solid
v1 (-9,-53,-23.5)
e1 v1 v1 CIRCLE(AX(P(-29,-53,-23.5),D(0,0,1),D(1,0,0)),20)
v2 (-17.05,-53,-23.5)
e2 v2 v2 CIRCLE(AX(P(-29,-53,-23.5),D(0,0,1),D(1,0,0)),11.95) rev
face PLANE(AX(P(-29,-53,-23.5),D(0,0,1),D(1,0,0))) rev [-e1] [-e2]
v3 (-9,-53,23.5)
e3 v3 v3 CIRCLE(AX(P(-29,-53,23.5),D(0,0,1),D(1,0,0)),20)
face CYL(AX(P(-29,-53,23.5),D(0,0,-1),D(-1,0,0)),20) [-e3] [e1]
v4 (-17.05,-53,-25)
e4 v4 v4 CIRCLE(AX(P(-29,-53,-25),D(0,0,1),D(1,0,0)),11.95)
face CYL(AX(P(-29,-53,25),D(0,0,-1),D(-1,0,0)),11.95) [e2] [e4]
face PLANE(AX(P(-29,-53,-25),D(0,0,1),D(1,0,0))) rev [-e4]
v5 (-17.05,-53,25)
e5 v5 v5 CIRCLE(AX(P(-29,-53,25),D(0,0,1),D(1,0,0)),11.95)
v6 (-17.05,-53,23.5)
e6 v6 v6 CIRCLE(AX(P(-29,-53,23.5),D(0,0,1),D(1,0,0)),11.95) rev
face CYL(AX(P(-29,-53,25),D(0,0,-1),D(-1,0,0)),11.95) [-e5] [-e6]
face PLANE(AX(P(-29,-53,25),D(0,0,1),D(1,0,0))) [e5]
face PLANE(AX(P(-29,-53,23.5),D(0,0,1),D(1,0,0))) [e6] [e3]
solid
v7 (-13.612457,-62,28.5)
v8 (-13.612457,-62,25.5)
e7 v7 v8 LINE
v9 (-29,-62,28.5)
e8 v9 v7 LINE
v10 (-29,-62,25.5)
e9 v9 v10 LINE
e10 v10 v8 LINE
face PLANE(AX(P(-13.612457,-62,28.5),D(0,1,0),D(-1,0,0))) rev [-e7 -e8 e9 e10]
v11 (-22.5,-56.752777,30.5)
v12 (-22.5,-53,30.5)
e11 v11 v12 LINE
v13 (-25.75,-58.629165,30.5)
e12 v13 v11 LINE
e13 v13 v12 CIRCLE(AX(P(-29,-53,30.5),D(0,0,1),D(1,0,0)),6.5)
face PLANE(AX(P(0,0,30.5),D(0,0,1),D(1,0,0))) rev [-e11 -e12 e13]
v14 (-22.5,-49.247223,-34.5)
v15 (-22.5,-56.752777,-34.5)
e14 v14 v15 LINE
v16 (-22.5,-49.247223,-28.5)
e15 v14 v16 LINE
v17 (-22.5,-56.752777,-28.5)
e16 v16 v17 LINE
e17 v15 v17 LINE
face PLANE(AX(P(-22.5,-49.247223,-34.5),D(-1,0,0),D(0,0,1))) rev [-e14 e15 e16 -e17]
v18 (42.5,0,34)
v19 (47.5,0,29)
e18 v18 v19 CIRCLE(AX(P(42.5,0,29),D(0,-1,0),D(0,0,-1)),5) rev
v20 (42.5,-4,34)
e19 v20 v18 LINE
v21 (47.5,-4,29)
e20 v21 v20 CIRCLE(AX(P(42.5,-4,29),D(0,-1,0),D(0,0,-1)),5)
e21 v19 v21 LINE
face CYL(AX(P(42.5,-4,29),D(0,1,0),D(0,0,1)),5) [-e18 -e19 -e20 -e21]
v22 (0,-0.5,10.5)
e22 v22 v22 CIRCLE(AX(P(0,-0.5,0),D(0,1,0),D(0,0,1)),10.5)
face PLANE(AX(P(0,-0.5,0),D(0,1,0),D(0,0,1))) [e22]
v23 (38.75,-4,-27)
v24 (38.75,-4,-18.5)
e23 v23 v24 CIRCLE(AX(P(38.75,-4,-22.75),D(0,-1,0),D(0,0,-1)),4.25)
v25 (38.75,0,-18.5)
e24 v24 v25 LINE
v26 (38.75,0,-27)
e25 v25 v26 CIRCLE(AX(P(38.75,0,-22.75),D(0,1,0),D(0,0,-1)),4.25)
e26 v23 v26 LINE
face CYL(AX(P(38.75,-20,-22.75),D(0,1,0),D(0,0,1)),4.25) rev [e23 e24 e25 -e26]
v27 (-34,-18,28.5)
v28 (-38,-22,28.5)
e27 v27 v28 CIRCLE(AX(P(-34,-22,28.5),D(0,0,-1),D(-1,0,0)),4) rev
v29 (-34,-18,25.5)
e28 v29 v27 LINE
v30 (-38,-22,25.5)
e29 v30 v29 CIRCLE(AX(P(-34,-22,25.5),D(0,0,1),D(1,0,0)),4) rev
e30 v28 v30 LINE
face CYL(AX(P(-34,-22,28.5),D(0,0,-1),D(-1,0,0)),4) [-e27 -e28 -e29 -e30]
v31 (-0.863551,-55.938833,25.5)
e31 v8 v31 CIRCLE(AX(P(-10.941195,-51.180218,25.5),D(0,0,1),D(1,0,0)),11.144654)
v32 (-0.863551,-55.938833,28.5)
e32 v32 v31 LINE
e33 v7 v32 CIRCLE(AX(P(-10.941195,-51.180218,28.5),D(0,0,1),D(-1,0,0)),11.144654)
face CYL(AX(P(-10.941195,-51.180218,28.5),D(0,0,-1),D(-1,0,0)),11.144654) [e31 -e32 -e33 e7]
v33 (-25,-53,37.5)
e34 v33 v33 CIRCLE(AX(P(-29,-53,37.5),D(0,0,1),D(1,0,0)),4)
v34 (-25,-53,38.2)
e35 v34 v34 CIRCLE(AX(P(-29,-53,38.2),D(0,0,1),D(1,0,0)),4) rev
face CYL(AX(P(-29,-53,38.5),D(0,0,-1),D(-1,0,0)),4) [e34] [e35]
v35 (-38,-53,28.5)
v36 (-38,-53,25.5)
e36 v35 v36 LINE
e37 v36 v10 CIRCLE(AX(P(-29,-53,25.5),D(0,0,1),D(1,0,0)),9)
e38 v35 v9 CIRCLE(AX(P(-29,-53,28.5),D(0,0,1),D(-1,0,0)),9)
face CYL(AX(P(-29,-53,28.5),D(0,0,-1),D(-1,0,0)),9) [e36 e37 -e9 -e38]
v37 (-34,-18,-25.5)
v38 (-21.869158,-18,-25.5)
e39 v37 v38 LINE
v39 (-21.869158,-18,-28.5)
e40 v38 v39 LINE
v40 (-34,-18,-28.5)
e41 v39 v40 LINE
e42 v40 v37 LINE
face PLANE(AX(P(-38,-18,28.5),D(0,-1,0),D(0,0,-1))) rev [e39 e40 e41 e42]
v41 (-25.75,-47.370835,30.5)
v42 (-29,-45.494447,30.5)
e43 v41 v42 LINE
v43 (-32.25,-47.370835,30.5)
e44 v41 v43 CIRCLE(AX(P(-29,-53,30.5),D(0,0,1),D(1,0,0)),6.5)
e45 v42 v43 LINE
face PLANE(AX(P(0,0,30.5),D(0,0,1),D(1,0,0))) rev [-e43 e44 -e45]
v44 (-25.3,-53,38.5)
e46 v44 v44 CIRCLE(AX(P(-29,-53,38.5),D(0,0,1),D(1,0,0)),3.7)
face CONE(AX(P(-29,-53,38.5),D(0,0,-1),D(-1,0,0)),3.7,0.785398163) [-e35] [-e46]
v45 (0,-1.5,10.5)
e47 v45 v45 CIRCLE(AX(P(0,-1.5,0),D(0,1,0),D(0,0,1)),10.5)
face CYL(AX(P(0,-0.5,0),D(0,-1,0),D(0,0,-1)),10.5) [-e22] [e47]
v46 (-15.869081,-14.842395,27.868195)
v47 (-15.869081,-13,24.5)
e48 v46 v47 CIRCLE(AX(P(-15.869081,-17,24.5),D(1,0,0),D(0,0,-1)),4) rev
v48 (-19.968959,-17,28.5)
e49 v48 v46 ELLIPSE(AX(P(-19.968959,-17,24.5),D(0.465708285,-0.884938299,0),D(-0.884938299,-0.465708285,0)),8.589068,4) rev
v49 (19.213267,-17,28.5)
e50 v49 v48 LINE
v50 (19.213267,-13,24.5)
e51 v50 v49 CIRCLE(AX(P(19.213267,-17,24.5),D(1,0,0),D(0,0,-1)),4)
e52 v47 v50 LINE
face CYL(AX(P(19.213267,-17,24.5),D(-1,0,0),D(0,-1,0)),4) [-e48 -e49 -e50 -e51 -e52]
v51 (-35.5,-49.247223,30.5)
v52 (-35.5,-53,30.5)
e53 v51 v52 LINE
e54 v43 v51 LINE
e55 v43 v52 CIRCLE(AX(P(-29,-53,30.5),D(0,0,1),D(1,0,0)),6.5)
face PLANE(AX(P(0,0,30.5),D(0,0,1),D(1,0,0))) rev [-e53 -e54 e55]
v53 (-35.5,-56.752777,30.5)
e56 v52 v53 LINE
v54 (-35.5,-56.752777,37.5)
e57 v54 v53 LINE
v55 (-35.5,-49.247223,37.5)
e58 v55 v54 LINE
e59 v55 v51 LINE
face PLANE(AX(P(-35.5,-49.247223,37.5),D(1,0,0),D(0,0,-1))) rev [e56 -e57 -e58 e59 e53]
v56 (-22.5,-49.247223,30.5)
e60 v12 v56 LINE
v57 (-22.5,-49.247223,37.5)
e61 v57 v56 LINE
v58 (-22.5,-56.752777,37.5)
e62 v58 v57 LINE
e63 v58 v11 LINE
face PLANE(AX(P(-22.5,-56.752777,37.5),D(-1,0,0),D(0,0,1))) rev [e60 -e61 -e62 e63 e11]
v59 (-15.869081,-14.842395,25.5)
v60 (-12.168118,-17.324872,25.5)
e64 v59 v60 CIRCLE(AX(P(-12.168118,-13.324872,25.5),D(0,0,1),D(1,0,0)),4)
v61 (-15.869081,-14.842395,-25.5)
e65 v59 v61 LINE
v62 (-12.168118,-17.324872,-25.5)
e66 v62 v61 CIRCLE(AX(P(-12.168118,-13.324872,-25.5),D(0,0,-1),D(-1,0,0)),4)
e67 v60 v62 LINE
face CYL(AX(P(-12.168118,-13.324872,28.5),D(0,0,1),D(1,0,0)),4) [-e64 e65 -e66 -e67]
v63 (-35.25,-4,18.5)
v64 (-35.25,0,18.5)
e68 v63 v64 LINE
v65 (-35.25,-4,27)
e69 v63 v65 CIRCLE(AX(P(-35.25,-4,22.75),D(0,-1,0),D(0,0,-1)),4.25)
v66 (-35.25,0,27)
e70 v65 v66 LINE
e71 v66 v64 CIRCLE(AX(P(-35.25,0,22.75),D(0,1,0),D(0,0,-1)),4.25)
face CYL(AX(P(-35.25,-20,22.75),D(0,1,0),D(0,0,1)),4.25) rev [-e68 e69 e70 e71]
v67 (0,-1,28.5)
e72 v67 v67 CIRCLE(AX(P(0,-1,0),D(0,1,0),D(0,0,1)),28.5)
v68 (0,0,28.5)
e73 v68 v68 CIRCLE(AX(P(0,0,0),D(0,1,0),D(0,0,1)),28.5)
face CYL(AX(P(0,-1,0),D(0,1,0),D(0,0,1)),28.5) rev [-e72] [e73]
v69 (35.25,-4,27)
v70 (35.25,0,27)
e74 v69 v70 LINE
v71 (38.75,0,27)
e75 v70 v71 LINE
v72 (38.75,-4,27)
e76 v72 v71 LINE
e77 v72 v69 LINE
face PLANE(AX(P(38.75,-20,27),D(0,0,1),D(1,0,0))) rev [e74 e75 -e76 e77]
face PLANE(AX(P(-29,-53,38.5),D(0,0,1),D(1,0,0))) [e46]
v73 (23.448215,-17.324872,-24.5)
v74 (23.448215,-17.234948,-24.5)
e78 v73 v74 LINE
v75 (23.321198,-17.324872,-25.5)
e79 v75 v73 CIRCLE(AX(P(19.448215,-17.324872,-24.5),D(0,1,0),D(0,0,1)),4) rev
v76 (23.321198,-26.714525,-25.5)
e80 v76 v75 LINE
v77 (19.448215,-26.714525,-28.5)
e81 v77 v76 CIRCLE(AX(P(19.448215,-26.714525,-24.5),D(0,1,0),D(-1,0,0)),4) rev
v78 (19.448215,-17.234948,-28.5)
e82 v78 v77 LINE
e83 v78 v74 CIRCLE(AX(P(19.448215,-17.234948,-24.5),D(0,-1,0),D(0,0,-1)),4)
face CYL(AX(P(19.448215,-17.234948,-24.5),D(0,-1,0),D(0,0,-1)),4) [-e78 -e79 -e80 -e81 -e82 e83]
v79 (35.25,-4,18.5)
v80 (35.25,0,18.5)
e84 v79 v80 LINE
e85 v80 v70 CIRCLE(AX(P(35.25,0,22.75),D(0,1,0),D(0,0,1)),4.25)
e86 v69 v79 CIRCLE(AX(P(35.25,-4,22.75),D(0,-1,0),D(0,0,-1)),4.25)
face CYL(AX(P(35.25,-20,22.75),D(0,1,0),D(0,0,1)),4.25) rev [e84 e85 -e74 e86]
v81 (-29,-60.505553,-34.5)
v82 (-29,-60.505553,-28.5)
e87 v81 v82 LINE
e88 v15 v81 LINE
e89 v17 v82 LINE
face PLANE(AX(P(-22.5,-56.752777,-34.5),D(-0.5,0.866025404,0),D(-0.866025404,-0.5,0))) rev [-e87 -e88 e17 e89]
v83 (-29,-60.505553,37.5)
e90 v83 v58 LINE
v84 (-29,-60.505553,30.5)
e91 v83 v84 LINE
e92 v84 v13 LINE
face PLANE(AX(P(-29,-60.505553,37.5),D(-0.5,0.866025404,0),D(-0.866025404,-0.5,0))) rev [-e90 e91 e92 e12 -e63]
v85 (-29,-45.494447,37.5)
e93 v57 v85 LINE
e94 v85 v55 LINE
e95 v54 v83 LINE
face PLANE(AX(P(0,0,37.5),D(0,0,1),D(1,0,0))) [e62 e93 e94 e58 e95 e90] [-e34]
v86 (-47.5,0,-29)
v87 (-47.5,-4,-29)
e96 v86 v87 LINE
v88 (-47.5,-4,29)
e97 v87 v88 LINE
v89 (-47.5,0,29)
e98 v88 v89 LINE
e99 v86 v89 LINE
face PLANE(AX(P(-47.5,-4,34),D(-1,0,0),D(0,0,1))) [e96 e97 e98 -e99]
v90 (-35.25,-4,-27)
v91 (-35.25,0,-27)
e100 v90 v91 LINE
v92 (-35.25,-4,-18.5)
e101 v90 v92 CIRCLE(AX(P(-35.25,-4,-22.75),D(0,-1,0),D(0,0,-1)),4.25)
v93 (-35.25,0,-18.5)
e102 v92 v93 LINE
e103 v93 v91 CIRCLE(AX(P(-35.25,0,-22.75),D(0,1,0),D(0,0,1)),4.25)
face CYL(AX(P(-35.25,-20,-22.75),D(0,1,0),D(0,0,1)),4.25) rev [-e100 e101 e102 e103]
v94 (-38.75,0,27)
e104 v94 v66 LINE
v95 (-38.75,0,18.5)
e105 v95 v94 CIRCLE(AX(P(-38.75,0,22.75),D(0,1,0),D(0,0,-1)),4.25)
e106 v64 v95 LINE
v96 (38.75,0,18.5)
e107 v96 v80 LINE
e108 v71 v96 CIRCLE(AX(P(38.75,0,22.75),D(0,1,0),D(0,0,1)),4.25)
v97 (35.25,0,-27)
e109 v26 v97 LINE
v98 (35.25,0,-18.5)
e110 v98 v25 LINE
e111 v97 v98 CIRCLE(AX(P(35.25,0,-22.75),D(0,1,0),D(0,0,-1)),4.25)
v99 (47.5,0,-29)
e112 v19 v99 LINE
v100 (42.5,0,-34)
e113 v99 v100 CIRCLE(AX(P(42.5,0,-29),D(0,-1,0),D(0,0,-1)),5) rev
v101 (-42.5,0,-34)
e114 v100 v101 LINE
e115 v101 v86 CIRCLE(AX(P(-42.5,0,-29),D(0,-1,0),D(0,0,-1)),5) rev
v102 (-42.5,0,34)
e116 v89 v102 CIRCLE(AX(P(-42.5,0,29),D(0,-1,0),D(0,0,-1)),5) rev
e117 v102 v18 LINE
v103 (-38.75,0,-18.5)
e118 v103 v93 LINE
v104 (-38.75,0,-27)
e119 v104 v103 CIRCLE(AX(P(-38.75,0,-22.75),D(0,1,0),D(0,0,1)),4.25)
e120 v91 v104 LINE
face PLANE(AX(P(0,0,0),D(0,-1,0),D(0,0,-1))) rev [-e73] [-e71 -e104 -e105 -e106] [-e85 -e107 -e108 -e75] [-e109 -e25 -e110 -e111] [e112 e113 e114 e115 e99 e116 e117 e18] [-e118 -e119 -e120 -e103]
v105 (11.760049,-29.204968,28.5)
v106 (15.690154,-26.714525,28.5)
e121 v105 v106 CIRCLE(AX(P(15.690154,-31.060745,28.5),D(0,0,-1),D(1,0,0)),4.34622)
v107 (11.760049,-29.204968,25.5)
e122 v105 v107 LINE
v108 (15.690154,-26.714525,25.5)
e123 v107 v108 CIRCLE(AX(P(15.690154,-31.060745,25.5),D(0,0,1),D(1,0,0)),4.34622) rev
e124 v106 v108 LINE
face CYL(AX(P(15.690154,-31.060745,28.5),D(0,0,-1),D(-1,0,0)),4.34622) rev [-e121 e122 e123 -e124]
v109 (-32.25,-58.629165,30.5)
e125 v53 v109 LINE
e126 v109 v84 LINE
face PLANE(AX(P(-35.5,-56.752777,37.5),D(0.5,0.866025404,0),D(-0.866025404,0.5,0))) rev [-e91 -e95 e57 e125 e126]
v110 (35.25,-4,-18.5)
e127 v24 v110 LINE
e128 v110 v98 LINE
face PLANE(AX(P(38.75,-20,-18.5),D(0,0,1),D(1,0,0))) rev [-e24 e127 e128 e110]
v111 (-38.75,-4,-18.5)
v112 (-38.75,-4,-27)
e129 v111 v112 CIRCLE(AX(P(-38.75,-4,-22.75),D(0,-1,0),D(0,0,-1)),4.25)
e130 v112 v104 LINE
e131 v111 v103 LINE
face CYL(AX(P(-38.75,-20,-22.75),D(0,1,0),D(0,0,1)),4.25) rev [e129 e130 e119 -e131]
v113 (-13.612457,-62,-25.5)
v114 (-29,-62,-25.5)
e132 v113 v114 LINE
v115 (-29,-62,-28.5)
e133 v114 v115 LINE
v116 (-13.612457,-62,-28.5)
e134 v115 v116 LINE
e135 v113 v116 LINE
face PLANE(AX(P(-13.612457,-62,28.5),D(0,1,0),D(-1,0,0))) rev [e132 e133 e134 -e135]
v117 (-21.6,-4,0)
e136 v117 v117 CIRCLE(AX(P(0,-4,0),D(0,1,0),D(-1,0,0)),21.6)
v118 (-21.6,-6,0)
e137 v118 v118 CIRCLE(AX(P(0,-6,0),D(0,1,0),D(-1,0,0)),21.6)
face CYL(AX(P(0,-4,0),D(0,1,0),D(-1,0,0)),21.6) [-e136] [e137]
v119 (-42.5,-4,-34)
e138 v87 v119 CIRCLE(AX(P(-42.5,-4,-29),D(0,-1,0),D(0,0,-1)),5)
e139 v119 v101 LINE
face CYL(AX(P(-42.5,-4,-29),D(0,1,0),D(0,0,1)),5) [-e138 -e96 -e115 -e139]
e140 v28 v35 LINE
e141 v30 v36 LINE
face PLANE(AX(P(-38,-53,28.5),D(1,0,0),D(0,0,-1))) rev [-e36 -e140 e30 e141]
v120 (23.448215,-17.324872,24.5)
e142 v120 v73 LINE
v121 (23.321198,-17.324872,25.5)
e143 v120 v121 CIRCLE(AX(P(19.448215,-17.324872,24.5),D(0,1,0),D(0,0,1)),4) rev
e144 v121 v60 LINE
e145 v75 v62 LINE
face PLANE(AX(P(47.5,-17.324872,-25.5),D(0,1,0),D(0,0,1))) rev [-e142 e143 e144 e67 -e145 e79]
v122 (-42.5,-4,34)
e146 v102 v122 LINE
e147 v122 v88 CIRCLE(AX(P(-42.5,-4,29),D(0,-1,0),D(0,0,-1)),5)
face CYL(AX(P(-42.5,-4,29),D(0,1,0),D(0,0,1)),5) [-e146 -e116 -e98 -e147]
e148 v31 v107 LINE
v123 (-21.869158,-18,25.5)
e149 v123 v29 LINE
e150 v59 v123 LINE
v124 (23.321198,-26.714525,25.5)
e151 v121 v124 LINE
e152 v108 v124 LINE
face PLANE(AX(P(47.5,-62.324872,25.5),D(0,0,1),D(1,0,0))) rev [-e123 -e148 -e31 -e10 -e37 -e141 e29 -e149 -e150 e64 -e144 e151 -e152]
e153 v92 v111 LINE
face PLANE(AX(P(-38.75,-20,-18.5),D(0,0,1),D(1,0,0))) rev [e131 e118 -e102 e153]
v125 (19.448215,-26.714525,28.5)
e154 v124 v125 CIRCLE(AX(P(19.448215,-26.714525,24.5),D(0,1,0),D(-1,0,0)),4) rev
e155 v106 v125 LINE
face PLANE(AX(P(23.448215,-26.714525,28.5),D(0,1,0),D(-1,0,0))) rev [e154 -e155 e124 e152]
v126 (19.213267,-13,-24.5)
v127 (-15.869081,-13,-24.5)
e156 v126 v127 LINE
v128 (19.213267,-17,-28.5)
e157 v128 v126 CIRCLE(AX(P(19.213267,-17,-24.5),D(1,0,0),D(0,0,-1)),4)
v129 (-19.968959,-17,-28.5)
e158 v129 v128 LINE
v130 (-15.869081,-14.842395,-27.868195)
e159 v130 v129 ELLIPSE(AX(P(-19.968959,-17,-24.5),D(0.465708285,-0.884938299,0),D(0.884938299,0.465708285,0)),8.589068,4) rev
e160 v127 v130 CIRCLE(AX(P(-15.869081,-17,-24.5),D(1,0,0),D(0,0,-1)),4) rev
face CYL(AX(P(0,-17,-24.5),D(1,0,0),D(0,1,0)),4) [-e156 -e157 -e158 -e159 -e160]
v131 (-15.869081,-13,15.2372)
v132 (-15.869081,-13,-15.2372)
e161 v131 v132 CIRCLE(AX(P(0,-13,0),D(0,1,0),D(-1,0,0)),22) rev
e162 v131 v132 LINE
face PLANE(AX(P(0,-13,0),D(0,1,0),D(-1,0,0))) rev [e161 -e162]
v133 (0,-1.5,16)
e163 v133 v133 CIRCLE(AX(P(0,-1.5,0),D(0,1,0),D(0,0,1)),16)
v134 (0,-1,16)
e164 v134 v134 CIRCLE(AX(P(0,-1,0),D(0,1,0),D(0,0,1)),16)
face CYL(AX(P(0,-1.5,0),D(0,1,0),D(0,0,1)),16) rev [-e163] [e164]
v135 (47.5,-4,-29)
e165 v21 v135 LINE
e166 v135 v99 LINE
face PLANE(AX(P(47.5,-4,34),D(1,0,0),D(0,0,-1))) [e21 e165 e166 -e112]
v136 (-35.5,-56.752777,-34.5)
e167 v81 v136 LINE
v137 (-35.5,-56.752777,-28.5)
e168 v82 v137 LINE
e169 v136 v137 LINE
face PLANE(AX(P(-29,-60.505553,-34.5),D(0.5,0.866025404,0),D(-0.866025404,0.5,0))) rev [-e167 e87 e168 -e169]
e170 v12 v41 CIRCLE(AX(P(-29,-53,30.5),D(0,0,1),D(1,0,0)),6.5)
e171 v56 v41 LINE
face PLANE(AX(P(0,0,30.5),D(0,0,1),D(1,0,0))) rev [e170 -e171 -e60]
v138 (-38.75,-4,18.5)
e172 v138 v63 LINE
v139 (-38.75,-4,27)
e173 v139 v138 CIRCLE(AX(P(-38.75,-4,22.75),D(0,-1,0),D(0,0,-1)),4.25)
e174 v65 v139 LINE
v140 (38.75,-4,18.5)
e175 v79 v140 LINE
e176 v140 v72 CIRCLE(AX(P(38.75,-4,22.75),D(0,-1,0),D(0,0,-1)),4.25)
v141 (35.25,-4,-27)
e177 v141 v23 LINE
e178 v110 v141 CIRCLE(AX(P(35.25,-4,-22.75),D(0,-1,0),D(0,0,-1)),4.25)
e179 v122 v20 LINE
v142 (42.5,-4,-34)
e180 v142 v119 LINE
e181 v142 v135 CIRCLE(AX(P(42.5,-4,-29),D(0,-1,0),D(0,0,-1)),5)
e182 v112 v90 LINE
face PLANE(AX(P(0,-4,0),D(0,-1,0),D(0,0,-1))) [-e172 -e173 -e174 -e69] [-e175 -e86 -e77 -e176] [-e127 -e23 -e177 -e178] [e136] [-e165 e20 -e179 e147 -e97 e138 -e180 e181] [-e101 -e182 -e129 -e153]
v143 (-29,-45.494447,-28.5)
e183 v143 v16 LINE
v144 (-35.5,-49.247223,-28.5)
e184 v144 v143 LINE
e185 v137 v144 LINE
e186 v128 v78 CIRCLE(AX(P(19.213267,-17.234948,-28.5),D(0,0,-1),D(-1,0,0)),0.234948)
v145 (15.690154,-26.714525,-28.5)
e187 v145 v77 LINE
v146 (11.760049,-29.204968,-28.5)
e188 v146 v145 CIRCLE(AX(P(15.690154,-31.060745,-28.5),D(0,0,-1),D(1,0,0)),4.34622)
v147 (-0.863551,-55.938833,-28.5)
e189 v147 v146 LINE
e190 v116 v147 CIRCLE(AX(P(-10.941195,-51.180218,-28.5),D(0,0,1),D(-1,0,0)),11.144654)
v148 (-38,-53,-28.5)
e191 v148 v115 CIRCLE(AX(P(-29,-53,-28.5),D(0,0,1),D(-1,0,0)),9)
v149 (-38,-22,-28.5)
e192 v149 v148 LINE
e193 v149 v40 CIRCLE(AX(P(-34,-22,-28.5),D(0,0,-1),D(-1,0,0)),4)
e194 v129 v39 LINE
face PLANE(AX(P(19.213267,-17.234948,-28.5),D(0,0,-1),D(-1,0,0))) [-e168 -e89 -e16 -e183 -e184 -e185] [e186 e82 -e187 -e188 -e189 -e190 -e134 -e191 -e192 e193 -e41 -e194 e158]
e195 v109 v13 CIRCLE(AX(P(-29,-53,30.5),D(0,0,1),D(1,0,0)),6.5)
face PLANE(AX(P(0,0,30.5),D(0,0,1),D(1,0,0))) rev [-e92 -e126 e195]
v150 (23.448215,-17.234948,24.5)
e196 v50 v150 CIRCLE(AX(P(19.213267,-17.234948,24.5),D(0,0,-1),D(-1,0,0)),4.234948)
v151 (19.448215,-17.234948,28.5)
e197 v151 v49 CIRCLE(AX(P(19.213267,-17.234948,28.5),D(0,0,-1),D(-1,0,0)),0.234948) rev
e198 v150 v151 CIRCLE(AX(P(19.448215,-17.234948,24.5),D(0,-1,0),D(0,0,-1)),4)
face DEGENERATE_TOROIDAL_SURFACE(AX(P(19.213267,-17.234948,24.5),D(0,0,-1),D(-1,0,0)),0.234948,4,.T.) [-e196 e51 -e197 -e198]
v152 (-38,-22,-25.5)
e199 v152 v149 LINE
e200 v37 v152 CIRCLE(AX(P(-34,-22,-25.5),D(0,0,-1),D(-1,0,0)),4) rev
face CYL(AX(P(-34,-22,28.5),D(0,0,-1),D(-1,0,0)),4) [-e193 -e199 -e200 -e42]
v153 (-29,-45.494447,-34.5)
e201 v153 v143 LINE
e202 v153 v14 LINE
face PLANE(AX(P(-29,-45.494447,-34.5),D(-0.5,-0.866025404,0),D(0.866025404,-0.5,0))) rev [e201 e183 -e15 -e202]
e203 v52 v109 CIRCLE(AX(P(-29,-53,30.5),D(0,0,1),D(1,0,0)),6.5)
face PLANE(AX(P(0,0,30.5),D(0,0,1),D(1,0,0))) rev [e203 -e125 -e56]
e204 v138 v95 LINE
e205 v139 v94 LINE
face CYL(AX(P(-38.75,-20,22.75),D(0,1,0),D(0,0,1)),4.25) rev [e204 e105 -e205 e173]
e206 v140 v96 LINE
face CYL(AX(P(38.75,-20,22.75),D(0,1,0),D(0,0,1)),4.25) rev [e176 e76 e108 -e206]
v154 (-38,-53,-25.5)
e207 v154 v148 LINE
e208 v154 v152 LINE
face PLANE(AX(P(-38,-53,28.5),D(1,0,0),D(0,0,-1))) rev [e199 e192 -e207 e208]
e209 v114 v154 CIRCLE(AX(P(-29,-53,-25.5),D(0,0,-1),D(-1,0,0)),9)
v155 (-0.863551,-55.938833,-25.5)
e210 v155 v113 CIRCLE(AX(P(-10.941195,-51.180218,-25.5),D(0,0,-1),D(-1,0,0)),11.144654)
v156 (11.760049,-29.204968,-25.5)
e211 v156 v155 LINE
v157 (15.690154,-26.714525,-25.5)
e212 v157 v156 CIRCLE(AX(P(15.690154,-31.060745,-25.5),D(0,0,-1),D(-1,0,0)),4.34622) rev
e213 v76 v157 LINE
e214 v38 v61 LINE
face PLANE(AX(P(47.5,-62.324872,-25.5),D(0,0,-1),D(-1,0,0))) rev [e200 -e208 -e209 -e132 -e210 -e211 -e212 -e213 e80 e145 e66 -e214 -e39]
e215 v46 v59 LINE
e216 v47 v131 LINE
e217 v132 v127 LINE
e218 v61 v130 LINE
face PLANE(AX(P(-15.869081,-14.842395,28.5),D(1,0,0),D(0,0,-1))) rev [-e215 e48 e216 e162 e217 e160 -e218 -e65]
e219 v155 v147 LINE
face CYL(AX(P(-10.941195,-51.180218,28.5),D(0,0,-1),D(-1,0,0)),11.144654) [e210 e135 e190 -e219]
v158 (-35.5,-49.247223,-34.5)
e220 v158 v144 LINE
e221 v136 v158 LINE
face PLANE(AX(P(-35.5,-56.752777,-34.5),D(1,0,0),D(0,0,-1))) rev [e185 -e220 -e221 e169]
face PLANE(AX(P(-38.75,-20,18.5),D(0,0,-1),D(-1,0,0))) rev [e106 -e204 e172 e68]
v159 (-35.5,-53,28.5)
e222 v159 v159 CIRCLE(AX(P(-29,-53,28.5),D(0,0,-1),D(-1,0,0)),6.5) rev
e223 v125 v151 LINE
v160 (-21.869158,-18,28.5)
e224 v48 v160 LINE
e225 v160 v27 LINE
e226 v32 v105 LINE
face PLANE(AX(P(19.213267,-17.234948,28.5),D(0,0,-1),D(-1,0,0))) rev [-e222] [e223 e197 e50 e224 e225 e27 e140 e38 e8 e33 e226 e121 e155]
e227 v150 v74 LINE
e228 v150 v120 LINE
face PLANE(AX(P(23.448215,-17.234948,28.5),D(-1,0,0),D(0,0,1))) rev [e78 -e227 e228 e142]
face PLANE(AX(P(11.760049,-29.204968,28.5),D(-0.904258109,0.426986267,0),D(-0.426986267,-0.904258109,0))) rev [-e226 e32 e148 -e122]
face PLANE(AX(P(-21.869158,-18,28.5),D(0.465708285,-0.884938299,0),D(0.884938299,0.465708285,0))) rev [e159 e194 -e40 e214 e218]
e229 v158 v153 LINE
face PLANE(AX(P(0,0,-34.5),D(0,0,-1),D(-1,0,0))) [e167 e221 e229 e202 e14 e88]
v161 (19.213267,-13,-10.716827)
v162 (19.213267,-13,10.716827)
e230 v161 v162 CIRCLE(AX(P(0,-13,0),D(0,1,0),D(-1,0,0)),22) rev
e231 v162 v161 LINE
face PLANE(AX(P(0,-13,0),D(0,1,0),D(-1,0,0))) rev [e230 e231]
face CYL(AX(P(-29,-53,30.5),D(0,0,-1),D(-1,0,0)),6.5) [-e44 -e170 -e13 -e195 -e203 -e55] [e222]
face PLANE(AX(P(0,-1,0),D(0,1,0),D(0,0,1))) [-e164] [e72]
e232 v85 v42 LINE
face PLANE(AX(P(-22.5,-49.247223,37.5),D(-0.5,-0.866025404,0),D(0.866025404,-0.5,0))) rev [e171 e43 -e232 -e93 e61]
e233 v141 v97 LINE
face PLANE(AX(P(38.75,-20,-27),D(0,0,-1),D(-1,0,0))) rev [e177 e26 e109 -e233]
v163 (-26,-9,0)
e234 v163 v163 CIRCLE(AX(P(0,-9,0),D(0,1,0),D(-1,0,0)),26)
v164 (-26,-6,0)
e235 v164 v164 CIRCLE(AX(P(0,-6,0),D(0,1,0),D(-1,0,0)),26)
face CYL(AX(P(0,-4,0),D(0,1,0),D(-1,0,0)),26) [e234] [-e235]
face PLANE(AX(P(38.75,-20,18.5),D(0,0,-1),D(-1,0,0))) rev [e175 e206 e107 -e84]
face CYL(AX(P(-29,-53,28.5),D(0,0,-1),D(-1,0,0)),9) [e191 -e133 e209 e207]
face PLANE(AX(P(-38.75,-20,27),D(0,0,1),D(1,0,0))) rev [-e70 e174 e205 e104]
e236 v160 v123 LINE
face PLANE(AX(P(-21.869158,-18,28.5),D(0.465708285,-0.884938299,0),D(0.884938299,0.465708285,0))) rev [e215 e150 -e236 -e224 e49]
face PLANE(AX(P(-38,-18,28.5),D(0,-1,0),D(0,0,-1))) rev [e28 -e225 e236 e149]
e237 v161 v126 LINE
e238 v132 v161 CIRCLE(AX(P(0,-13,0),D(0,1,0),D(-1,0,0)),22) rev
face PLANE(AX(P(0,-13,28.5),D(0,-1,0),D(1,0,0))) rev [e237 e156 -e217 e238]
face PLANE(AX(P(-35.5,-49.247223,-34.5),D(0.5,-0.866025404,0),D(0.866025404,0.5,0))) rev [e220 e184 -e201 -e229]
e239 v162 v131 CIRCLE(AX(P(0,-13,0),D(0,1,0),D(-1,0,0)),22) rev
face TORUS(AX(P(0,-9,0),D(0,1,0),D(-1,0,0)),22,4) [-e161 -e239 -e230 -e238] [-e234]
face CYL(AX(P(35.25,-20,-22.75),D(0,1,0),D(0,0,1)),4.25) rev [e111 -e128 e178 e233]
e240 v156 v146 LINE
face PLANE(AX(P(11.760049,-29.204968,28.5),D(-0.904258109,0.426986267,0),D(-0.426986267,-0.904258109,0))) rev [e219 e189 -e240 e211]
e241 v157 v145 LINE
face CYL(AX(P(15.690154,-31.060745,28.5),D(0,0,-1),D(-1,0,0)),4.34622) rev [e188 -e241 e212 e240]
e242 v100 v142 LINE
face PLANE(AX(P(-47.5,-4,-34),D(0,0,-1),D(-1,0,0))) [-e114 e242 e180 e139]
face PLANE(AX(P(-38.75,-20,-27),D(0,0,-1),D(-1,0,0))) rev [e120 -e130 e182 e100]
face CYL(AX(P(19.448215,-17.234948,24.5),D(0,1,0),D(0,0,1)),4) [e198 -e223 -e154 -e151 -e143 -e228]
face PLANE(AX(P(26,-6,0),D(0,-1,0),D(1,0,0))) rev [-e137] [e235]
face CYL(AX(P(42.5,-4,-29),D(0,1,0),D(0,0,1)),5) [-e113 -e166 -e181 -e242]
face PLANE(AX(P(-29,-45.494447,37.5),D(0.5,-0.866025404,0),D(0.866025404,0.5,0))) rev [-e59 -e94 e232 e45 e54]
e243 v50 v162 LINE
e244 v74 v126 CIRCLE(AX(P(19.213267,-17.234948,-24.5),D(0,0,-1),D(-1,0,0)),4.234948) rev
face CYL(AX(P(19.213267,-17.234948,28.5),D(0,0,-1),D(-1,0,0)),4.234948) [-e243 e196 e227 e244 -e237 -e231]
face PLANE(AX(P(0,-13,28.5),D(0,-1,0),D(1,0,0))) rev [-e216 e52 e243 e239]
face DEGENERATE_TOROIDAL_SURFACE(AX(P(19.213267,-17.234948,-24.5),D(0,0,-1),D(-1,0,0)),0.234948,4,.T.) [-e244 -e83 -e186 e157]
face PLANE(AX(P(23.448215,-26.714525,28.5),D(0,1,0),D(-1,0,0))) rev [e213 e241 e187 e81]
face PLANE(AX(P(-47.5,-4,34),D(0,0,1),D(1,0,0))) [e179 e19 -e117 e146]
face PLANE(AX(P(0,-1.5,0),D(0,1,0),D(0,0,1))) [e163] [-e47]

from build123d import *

# Parameters (mm, degrees)
SKETCH_1_W               = 95
SKETCH_1_H               = 68
EXTRUDE_1_DEPTH          = 4
CUT_EXTRUDE_1_DEPTH      = 20
FILLET_3_R               = 4
EXTRUDE_2_DEPTH          = 28.5
CUT_EXTRUDE_2_DEPTH      = 112.133432069
CUT_EXTRUDE_2_DEPTH_BACK = 112.133432069
SKETCH_5_W               = 51
SKETCH_5_H               = 45
FILLET_1_R               = 5
SKETCH_6_R               = 20
EXTRUDE_3_DEPTH          = 23.5
SKETCH_7_R               = 11.95
EXTRUDE_4_DEPTH          = 25
EXTRUDE_5_DEPTH          = 6
SKETCH_9_R               = 6.5
EXTRUDE_6_DEPTH          = 2
EXTRUDE_7_DEPTH          = 7
SKETCH_11_R              = 4
EXTRUDE_8_DEPTH          = 1
CHAMFER_1_SIZE           = 0.3
FILLET_4_R               = 4
SKETCH_12_R              = 28.5
CUT_EXTRUDE_3_DEPTH      = 1
SKETCH_13_R              = 16
CUT_EXTRUDE_4_DEPTH      = 0.5
SKETCH_14_R              = 10.5
EXTRUDE_9_DEPTH          = 1
FILLET_5_R               = 4


with BuildPart() as part:
    # 草图1 → 凸台-拉伸1 (new body)
    with BuildSketch(Plane(origin=(0, 0, 0), x_dir=(1, 0, 0), z_dir=(0, 1, 0))):
        Rectangle(SKETCH_1_W, SKETCH_1_H)
    extrude(amount=-EXTRUDE_1_DEPTH)

    # 草图2 → 切除-拉伸1 (cut)
    with BuildSketch(Plane(origin=(0, 0, 0), x_dir=(1, 0, 0), z_dir=(0, 1, 0))):
        with BuildLine():
            Line((-38.75, 27), (-35.25, 27))
            ThreePointArc((-35.25, 27), (-31, 22.75), (-35.25, 18.5))
            Line((-35.25, 18.5), (-38.75, 18.5))
            ThreePointArc((-38.75, 18.5), (-43, 22.75), (-38.75, 27))
        make_face()
        with BuildLine():
            Line((38.75, 27), (35.25, 27))
            ThreePointArc((35.25, 27), (31, 22.75), (35.25, 18.5))
            Line((35.25, 18.5), (38.75, 18.5))
            ThreePointArc((38.75, 18.5), (43, 22.75), (38.75, 27))
        make_face()
        with BuildLine():
            Line((-38.75, -27), (-35.25, -27))
            ThreePointArc((-35.25, -27), (-31, -22.75), (-35.25, -18.5))
            Line((-35.25, -18.5), (-38.75, -18.5))
            ThreePointArc((-38.75, -18.5), (-43, -22.75), (-38.75, -27))
        make_face()
        with BuildLine():
            Line((38.75, -27), (35.25, -27))
            ThreePointArc((35.25, -27), (31, -22.75), (35.25, -18.5))
            Line((35.25, -18.5), (38.75, -18.5))
            ThreePointArc((38.75, -18.5), (43, -22.75), (38.75, -27))
        make_face()
    extrude(amount=-CUT_EXTRUDE_1_DEPTH, mode=Mode.SUBTRACT)

    # 草图3 → 旋转1 (revolve)
    with BuildSketch(Plane.XY, mode=Mode.PRIVATE) as revolve_1_sk:
        Polygon((0, -4), (0, -13), (26, -13), (26, -6), (21.6, -6), (21.6, -4), align=None)
    revolve(revolve_1_sk.sketch.rotate(Axis((0, -4, 0), (0, -1, 0)), 180), axis=Axis((0, -4, 0), (0, -1, 0)))

    # 圆角3
    fillet_3_edges = [part.edges().sort_by_distance(p)[0] for p in [
        (26, -13, 0),
    ]]
    fillet(fillet_3_edges, radius=FILLET_3_R)

    # 草图4 → 凸台-拉伸2 (add, symmetric)
    with BuildSketch(Plane.XY):
        with BuildLine():
            Line((0, -13), (19.213266574, -13))
            ThreePointArc((19.213266574, -13), (22.207827325, -14.240387677), (23.448215001, -17.234948428))
            Line((23.448215001, -17.234948428), (23.448215001, -26.714524519))
            Line((23.448215001, -26.714524519), (15.690154109, -26.714524519))
            ThreePointArc((15.690154109, -26.714524519), (13.363781565, -27.389556753), (11.760049066, -29.204968498))
            Line((11.760049066, -29.204968498), (-0.86355109, -55.938832562))
            ThreePointArc((-0.86355109, -55.938832562), (-6.156003064, -61.245269428), (-13.61245677, -62))
            Line((-13.61245677, -62), (-29, -62))
            ThreePointArc((-29, -62), (-35.363961031, -59.363961031), (-38, -53))
            Line((-38, -53), (-38, -18))
            Line((-38, -18), (-21.869158005, -18))
            Line((-21.869158005, -18), (-15.86908091, -14.84239498))
            Line((-15.86908091, -14.84239498), (-15.86908091, -13))
            Line((-15.86908091, -13), (0, -13))
        make_face()
    extrude(amount=EXTRUDE_2_DEPTH, both=True)

    # 草图5 → 切除-拉伸2 (cut, two sides: drawn at the far end of the back side and taken through both)
    with BuildSketch(Plane.ZY.offset(38).offset(-CUT_EXTRUDE_2_DEPTH_BACK)):
        with Locations((0, -39.824872431)):
            Rectangle(SKETCH_5_W, SKETCH_5_H)
    extrude(amount=CUT_EXTRUDE_2_DEPTH + CUT_EXTRUDE_2_DEPTH_BACK, mode=Mode.SUBTRACT)

    # 圆角1
    fillet_1_edges = [part.edges().sort_by_distance(p)[0] for p in [
        (47.5, -2, 34),
        (-47.5, -2, 34),
        (-47.5, -2, -34),
        (47.5, -2, -34),
    ]]
    fillet(fillet_1_edges, radius=FILLET_1_R)

    # 草图8 → 凸台-拉伸5 (add)
    with BuildSketch(Plane(origin=(0, 0, -28.5), x_dir=(-1, 0, 0), z_dir=(0, 0, -1))):
        Polygon((29, -45.494446501), (22.5, -49.24722325), (22.5, -56.75277675), (29, -60.505553499), (35.5, -56.75277675), (35.5, -49.24722325), align=None)
    extrude(amount=EXTRUDE_5_DEPTH)

    # 草图9 → 凸台-拉伸6 (add)
    with BuildSketch(Plane.XY.offset(28.5)):
        with Locations(Location((-29, -53, 0), (0, 0, 180))):
            Circle(SKETCH_9_R)
    extrude(amount=EXTRUDE_6_DEPTH)

    # 草图10 → 凸台-拉伸7 (add)
    with BuildSketch(Plane.XY.offset(30.5)):
        Polygon((-29, -45.494446501), (-35.5, -49.24722325), (-35.5, -56.75277675), (-29, -60.505553499), (-22.5, -56.75277675), (-22.5, -49.24722325), align=None)
    extrude(amount=EXTRUDE_7_DEPTH)

    # 草图11 → 凸台-拉伸8 (add)
    with BuildSketch(Plane.XY.offset(37.5)):
        with Locations((-29, -53)):
            Circle(SKETCH_11_R)
    extrude(amount=EXTRUDE_8_DEPTH)

    # 倒角1
    chamfer_1_edges = [part.edges().sort_by_distance(p)[0] for p in [
        (-33, -53, 38.5),
    ]]
    chamfer(chamfer_1_edges, length=CHAMFER_1_SIZE)

    # 圆角4
    # the kernel refuses this fillet: 4 mm, written as the material it takes off along each edge
    with BuildSketch(Plane(origin=(-38, -18, -15.5), x_dir=(1, 0, 0), z_dir=(0, 0, -1))) as fillet_4_piece_1:
        with BuildLine():
            CenterArc((FILLET_4_R, FILLET_4_R), FILLET_4_R, 180, 90)
            Line((0, FILLET_4_R), (0, 0))
            Line((0, 0), (FILLET_4_R, 0))
        make_face()
    extrude(amount=23, mode=Mode.SUBTRACT)
    with BuildSketch(Plane(origin=(-20.586281446, -17.324872431, 25.5), x_dir=(0.8849382990030265, 0.46570828525765995, 0), z_dir=(0, 0, -1))) as fillet_4_piece_2:
        with BuildLine():
            CenterArc((9.312388245, 0.380655196), FILLET_4_R, 117.756070689, 67.704676822)
            Line((7.449555104, 3.920408392), (0, 0))
            Line((0, 0), (5.330541736, 0))
        make_face()
    extrude(amount=51, mode=Mode.SUBTRACT)
    with BuildSketch(Plane(origin=(-38, -18, 38.5), x_dir=(0, -1, 0), z_dir=(0, 0, -1))) as fillet_4_piece_3:
        with BuildLine():
            CenterArc((FILLET_4_R, -FILLET_4_R), FILLET_4_R, 90, 90)
            Line((0, -FILLET_4_R), (0, 0))
            Line((0, 0), (FILLET_4_R, 0))
        make_face()
    extrude(amount=23, mode=Mode.SUBTRACT)

    # 草图12 → 切除-拉伸3 (cut)
    with BuildSketch(Plane(origin=(0, 0, 0), x_dir=(1, 0, 0), z_dir=(0, 1, 0))):
        with Locations(Location((0, 0, 0), (0, 0, 270))):
            Circle(SKETCH_12_R)
    extrude(amount=-CUT_EXTRUDE_3_DEPTH, mode=Mode.SUBTRACT)

    # 草图13 → 切除-拉伸4 (cut)
    with BuildSketch(Plane(origin=(0, -1, 0), x_dir=(1, 0, 0), z_dir=(0, 1, 0))):
        with Locations(Location((0, 0, 0), (0, 0, 270))):
            Circle(SKETCH_13_R)
    extrude(amount=-CUT_EXTRUDE_4_DEPTH, mode=Mode.SUBTRACT)

    # 草图14 → 凸台-拉伸9 (add)
    with BuildSketch(Plane(origin=(0, -1.5, 0), x_dir=(1, 0, 0), z_dir=(0, 1, 0))):
        with Locations(Location((0, 0, 0), (0, 0, 270))):
            Circle(SKETCH_14_R)
    extrude(amount=EXTRUDE_9_DEPTH)

    # 圆角5
    fillet_5_edges = [part.edges().sort_by_distance(p)[0] for p in [
        (23.448215001, -21.974736473, -28.5),
        (22.207827325, -14.240387677, -28.5),
        (23.448215001, -21.974736473, 28.5),
        (22.207827325, -14.240387677, 28.5),
        (1.672092832, -13, -28.5),
        (1.672092832, -13, 28.5),
    ]]
    fillet(fillet_5_edges, radius=FILLET_5_R)


with BuildPart() as body_2:
    # 草图6 → 凸台-拉伸3 (new, symmetric)
    with BuildSketch(Plane.XY):
        with Locations((-29, -53)):
            Circle(SKETCH_6_R)
    extrude(amount=EXTRUDE_3_DEPTH, both=True)

    # 草图7 → 凸台-拉伸4 (add, symmetric)
    with BuildSketch(Plane.XY):
        with Locations((-29, -53)):
            Circle(SKETCH_7_R)
    extrude(amount=EXTRUDE_4_DEPTH, both=True)


solid = Compound([part.part, body_2.part])
